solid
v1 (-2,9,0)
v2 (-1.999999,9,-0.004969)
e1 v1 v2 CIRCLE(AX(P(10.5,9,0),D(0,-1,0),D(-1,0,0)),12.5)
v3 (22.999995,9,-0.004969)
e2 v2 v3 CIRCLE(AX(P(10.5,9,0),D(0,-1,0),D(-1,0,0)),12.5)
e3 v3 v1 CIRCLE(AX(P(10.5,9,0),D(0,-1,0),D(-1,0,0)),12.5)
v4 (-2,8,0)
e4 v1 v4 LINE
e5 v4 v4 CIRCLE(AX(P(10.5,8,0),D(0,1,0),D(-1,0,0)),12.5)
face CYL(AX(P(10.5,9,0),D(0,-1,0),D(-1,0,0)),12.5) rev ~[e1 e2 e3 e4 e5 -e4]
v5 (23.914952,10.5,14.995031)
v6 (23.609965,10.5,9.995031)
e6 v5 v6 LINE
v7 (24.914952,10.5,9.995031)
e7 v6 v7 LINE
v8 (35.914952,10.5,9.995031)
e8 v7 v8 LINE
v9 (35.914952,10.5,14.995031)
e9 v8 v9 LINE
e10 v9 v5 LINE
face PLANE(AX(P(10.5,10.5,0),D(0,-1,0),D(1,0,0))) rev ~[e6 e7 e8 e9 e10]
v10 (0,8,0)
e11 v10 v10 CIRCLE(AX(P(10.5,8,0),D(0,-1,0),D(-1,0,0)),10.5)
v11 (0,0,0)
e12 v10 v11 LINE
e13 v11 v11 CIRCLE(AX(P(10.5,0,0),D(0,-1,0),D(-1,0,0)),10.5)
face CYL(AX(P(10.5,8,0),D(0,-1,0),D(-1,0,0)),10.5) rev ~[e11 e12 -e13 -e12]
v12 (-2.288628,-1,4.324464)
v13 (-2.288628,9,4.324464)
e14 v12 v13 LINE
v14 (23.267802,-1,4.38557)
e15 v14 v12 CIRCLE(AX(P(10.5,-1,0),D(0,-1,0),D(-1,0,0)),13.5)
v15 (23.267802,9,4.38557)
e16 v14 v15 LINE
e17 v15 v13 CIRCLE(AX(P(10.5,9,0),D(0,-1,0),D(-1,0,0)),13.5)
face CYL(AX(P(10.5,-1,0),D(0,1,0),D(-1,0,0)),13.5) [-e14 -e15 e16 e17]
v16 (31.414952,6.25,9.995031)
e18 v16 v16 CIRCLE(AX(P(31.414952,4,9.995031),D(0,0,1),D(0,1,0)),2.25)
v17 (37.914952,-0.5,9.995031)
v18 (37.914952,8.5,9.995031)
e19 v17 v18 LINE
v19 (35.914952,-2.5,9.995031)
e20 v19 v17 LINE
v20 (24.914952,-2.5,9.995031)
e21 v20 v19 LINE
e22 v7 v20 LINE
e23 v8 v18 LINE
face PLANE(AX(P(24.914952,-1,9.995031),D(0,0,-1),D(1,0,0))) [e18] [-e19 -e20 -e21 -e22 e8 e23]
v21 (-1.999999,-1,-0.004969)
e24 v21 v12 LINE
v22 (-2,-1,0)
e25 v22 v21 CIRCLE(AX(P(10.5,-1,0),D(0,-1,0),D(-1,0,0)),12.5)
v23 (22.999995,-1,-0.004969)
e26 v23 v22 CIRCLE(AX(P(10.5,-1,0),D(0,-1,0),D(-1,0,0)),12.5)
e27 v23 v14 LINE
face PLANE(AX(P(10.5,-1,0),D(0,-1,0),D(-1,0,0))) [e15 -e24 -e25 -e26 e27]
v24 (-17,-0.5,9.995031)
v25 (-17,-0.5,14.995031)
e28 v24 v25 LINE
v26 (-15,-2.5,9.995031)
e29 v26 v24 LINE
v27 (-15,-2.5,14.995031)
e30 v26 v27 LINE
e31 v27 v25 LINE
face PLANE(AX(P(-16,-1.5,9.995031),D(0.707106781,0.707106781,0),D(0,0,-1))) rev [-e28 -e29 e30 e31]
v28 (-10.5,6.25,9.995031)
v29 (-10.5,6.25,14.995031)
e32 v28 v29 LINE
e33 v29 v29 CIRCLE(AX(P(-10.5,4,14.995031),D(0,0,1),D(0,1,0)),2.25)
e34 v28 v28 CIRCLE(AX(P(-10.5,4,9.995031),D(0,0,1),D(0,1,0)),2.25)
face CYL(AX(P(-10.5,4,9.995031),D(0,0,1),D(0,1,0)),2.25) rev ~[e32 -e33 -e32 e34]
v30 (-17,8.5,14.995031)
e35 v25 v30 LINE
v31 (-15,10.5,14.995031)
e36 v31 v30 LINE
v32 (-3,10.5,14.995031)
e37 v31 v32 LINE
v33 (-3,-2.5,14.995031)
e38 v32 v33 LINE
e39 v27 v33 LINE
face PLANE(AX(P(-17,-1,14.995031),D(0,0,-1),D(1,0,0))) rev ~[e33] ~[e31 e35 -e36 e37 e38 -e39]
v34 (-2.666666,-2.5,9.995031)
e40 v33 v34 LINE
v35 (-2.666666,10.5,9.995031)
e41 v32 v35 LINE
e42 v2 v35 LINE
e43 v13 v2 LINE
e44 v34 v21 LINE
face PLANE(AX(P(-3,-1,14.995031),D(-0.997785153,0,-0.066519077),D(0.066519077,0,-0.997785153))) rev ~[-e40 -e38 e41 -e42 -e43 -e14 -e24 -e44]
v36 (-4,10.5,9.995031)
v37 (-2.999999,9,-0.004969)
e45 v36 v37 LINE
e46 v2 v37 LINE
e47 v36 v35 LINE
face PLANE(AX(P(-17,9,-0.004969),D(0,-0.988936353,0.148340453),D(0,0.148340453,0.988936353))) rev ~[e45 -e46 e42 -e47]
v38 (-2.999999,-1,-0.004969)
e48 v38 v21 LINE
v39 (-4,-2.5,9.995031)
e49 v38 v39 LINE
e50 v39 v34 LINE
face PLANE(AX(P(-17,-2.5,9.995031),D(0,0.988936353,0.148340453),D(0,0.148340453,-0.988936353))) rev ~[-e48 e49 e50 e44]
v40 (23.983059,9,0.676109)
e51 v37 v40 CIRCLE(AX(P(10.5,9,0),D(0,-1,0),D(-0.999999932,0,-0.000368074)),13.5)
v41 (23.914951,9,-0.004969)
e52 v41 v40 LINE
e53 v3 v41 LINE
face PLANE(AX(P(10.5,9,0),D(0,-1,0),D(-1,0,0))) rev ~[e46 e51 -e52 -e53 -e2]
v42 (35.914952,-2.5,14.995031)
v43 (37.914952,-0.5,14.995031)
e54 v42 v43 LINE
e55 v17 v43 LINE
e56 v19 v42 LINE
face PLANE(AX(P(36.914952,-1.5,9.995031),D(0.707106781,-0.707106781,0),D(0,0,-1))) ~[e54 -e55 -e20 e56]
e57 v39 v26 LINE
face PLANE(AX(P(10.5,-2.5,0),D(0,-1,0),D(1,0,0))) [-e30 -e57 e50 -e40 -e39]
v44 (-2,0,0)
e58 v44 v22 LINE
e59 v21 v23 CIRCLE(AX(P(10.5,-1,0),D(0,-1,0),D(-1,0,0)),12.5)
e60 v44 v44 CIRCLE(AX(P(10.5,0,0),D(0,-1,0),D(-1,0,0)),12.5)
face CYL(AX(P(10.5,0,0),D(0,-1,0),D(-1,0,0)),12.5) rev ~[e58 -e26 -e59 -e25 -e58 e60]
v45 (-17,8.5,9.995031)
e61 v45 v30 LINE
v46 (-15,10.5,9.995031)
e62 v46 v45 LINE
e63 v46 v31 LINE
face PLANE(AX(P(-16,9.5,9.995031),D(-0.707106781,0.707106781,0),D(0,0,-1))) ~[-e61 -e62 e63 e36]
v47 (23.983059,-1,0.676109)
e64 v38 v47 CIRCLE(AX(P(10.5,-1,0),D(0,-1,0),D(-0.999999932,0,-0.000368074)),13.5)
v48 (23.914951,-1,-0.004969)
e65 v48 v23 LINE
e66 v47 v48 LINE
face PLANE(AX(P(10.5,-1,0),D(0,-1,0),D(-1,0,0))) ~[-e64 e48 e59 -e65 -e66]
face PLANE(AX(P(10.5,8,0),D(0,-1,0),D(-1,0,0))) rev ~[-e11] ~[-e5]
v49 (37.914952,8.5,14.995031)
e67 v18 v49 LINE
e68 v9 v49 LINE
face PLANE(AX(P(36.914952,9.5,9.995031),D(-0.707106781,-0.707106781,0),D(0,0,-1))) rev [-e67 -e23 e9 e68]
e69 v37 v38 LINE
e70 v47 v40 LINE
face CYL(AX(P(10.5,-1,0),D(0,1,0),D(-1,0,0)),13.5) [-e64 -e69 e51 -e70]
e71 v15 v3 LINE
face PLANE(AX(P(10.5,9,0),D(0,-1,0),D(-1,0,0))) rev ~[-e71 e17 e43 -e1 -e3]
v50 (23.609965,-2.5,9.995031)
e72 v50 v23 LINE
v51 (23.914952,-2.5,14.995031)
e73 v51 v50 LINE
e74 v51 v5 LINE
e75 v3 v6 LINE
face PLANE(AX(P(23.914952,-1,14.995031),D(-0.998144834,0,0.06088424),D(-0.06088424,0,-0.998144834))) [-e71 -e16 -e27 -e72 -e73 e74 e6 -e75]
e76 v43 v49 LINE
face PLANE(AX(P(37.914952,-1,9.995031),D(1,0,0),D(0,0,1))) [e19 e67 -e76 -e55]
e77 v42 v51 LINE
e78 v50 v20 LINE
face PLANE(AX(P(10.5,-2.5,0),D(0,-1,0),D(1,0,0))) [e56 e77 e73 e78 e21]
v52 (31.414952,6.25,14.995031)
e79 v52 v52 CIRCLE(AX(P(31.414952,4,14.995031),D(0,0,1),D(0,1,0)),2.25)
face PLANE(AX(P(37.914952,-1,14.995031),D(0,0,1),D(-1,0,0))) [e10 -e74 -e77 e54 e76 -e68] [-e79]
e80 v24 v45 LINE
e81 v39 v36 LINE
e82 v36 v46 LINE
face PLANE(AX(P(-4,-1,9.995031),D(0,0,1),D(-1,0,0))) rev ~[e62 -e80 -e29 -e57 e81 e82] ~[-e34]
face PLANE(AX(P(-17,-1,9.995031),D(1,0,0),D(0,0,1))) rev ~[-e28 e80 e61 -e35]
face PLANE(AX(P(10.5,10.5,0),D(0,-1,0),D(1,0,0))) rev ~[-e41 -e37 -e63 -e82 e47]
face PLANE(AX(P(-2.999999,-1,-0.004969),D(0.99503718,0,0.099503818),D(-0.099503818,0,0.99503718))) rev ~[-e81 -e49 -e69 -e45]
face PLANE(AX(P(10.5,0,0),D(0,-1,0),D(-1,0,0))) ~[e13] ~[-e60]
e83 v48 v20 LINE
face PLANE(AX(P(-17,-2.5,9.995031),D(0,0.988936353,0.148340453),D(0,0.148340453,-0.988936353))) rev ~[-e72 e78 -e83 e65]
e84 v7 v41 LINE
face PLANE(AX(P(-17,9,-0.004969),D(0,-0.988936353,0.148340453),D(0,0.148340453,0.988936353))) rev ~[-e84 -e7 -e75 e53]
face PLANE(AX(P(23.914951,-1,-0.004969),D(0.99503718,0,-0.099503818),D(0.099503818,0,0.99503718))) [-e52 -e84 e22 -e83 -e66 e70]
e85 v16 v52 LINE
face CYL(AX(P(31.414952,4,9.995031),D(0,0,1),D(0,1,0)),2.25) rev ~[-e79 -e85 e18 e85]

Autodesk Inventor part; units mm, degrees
ref_plane "YZ Plane" through (0, 0, 0) normal (1, 0, 0) x (0, 1, 0)
ref_plane "XZ Plane" through (0, 0, 0) normal (0, 1, 0) x (-1, 0, 0)
ref_plane "XY Plane" through (0, 0, 0) normal (0, 0, 1) x (1, 0, 0)
sketch "Skizze1" plane through (0, 0, 0) normal (0, 0, 1) x (1, 0, 0)
  line L0 (0, 0) -> (-2, 0)
  line L1 (-2, 0) -> (-2, -1)
  line L2 (-2, -1) -> (-3, -1)
  line L3 (-3, -1) -> (-3, 9)
  line L4 (-3, 9) -> (-2, 9)
  line L5 (-2, 9) -> (-2, 8)
  line L6 (-2, 8) -> (0, 8)
  line L7 (0, 8) -> (0, 0)
  line L8 (10.5, 10.652115) -> (10.5, -3.008314) construction
  dimension "d0" = 3
  dimension "d1" = 10
  dimension "d2" = 8
  dimension "d3" = 1
  dimension "d4" = 2
  dimension "d5" = 10.5
sketch "Skizze1 outline for Umdrehung1" plane through (0, 0, 0) normal (0, 0, 1) x (1, 0, 0)
  line L0 (0, 0) -> (-2, 0)
  line L1 (-2, 0) -> (-2, -1)
  line L2 (-2, -1) -> (-3, -1)
  line L3 (-3, -1) -> (-3, 9)
  line L4 (-3, 9) -> (-2, 9)
  line L5 (-2, 9) -> (-2, 8)
  line L6 (-2, 8) -> (0, 8)
  line L7 (0, 8) -> (0, 0)
revolve "Umdrehung1" add sketch "Skizze1 outline for Umdrehung1" angle 360 about axis through (10.5, 10.652115, 0) along (0, -1, 0)
sketch "Skizze2" plane through (10.5, -1, 0) normal (0, -1, 0) x (1, 0, 0)
  circle A0 centre (0, 0) radius 13.5 construction
  line L0 (-13.499999, -0.004969) -> (1.488599, -0.004969) construction
  line L1 (-13.5, 14.995031) -> (-27.5, 14.995031)
  line L2 (-27.5, 14.995031) -> (-27.5, 9.995031)
  circle A1 centre (0, 0) radius 12.5 construction
  circle A2 centre (0, 0) radius 13.5
  circle A3 centre (0, 0) radius 12.5
  circle A4 centre (0, 0) radius 12.5
  line L3 (-27.5, 9.995031) -> (-14.5, 9.995031)
  line L4 (-14.5, 9.995031) -> (-13.499999, -0.004969)
  line L5 (-0.042524, -33.95519) -> (-0.042524, 19.973998) construction
  line L6 (13.414952, 14.995031) -> (27.414952, 14.995031)
  line L7 (27.414952, 14.995031) -> (27.414952, 9.995031)
  line L8 (12.499991, -0.004969) -> (13.414952, 14.995031)
  line L9 (27.414952, 9.995031) -> (14.414952, 9.995031)
  line L10 (14.414952, 9.995031) -> (13.414951, -0.004969)
  line L11 (-13.5, 14.995031) -> (-12.499999, -0.004969)
  circle A5 centre (0, 0) radius 12.5
  line L12 (-12.499999, -0.004969) -> (-13.499999, -0.004969)
  line L13 (13.414951, -0.004969) -> (12.499991, -0.004969)
  point P0 (-10.5, 0)
  point P1 (10.414952, 0)
  dimension "d9" = 15
  dimension "d11" = 5
  dimension "d12" = 13
  dimension "d13" = 14
  dimension "d14" = 27.5
sketch "Skizze2 outline for Extrusion1" plane through (10.5, -1, 0) normal (0, -1, 0) x (1, 0, 0)
  line L0 (12.499991, -0.004969) -> (13.414951, -0.004969)
  line L1 (13.414952, 14.995031) -> (12.499991, -0.004969)
  line L2 (27.414952, 14.995031) -> (13.414952, 14.995031)
  line L3 (27.414952, 9.995031) -> (27.414952, 14.995031)
  line L4 (14.414952, 9.995031) -> (27.414952, 9.995031)
  line L5 (13.414951, -0.004969) -> (14.414952, 9.995031)
  line L6 (-13.499999, -0.004969) -> (-14.5, 9.995031)
  line L7 (-14.5, 9.995031) -> (-27.5, 9.995031)
  line L8 (-27.5, 9.995031) -> (-27.5, 14.995031)
  line L9 (-27.5, 14.995031) -> (-13.5, 14.995031)
  line L10 (-13.5, 14.995031) -> (-12.499999, -0.004969)
  line L11 (-12.499999, -0.004969) -> (-13.499999, -0.004969)
extrude "Extrusion1" add sketch "Skizze2 outline for Extrusion1" against normal blind 11.5 and the other way blind 1.5
sketch "Skizze5" plane through (-17, -2.5, 14.995031) normal (-1, 0, 0) x (0, 0, 1)
  line L0 (-15, 13) -> (-15, 11.5) projected
  line L1 (-5, 13) -> (-5, 0) projected
  line L2 (-15, 11.5) -> (-5, 13)
  line L3 (-5, 13) -> (-15, 13)
  line L4 (-15, 13) -> (-15, 11.5)
  line L5 (-15, 1.5) -> (-15, 11.5) projected
  line L6 (-15, 1.5) -> (-5, 0)
  line L7 (0, 0) -> (-15, 0) projected
  line L8 (-15, 1.5) -> (-15, 0) projected
  line L9 (-15, 0) -> (-15, 1.5)
  line L10 (-15, 0) -> (-5, 0)
  point P0 (-14.995031, 2.5)
sketch "Skizze5 outline for Extrusion4" plane through (-17, -2.5, 14.995031) normal (-1, 0, 0) x (0, 0, 1)
  line L0 (-15, 13) -> (-15, 11.5)
  line L1 (-5, 13) -> (-15, 13)
  line L2 (-15, 11.5) -> (-5, 13)
  line L3 (-5, 0) -> (-15, 1.5)
  line L4 (-15, 0) -> (-5, 0)
  line L5 (-15, 1.5) -> (-15, 0)
extrude "Extrusion4" cut sketch "Skizze5 outline for Extrusion4" against normal through all
chamfer "Fase1" distance 2 angle 45 4 edges at (-17, -2.5, 12.495) (-17, 10.5, 12.495) (37.915, -2.5, 12.495) (37.915, 10.5, 12.495)
hole "Bohrung1" at (31.414952, 4, 9.995031) direction (0, 0, 1) diameter 4.5 end through all
hole "Bohrung2" at (-10.5, 4, 9.995031) direction (0, 0, 1) diameter 4.5 end through all
properties part number "lagerblock" material "Gusseisen, grau, ASTM A48 Klasse 20"
